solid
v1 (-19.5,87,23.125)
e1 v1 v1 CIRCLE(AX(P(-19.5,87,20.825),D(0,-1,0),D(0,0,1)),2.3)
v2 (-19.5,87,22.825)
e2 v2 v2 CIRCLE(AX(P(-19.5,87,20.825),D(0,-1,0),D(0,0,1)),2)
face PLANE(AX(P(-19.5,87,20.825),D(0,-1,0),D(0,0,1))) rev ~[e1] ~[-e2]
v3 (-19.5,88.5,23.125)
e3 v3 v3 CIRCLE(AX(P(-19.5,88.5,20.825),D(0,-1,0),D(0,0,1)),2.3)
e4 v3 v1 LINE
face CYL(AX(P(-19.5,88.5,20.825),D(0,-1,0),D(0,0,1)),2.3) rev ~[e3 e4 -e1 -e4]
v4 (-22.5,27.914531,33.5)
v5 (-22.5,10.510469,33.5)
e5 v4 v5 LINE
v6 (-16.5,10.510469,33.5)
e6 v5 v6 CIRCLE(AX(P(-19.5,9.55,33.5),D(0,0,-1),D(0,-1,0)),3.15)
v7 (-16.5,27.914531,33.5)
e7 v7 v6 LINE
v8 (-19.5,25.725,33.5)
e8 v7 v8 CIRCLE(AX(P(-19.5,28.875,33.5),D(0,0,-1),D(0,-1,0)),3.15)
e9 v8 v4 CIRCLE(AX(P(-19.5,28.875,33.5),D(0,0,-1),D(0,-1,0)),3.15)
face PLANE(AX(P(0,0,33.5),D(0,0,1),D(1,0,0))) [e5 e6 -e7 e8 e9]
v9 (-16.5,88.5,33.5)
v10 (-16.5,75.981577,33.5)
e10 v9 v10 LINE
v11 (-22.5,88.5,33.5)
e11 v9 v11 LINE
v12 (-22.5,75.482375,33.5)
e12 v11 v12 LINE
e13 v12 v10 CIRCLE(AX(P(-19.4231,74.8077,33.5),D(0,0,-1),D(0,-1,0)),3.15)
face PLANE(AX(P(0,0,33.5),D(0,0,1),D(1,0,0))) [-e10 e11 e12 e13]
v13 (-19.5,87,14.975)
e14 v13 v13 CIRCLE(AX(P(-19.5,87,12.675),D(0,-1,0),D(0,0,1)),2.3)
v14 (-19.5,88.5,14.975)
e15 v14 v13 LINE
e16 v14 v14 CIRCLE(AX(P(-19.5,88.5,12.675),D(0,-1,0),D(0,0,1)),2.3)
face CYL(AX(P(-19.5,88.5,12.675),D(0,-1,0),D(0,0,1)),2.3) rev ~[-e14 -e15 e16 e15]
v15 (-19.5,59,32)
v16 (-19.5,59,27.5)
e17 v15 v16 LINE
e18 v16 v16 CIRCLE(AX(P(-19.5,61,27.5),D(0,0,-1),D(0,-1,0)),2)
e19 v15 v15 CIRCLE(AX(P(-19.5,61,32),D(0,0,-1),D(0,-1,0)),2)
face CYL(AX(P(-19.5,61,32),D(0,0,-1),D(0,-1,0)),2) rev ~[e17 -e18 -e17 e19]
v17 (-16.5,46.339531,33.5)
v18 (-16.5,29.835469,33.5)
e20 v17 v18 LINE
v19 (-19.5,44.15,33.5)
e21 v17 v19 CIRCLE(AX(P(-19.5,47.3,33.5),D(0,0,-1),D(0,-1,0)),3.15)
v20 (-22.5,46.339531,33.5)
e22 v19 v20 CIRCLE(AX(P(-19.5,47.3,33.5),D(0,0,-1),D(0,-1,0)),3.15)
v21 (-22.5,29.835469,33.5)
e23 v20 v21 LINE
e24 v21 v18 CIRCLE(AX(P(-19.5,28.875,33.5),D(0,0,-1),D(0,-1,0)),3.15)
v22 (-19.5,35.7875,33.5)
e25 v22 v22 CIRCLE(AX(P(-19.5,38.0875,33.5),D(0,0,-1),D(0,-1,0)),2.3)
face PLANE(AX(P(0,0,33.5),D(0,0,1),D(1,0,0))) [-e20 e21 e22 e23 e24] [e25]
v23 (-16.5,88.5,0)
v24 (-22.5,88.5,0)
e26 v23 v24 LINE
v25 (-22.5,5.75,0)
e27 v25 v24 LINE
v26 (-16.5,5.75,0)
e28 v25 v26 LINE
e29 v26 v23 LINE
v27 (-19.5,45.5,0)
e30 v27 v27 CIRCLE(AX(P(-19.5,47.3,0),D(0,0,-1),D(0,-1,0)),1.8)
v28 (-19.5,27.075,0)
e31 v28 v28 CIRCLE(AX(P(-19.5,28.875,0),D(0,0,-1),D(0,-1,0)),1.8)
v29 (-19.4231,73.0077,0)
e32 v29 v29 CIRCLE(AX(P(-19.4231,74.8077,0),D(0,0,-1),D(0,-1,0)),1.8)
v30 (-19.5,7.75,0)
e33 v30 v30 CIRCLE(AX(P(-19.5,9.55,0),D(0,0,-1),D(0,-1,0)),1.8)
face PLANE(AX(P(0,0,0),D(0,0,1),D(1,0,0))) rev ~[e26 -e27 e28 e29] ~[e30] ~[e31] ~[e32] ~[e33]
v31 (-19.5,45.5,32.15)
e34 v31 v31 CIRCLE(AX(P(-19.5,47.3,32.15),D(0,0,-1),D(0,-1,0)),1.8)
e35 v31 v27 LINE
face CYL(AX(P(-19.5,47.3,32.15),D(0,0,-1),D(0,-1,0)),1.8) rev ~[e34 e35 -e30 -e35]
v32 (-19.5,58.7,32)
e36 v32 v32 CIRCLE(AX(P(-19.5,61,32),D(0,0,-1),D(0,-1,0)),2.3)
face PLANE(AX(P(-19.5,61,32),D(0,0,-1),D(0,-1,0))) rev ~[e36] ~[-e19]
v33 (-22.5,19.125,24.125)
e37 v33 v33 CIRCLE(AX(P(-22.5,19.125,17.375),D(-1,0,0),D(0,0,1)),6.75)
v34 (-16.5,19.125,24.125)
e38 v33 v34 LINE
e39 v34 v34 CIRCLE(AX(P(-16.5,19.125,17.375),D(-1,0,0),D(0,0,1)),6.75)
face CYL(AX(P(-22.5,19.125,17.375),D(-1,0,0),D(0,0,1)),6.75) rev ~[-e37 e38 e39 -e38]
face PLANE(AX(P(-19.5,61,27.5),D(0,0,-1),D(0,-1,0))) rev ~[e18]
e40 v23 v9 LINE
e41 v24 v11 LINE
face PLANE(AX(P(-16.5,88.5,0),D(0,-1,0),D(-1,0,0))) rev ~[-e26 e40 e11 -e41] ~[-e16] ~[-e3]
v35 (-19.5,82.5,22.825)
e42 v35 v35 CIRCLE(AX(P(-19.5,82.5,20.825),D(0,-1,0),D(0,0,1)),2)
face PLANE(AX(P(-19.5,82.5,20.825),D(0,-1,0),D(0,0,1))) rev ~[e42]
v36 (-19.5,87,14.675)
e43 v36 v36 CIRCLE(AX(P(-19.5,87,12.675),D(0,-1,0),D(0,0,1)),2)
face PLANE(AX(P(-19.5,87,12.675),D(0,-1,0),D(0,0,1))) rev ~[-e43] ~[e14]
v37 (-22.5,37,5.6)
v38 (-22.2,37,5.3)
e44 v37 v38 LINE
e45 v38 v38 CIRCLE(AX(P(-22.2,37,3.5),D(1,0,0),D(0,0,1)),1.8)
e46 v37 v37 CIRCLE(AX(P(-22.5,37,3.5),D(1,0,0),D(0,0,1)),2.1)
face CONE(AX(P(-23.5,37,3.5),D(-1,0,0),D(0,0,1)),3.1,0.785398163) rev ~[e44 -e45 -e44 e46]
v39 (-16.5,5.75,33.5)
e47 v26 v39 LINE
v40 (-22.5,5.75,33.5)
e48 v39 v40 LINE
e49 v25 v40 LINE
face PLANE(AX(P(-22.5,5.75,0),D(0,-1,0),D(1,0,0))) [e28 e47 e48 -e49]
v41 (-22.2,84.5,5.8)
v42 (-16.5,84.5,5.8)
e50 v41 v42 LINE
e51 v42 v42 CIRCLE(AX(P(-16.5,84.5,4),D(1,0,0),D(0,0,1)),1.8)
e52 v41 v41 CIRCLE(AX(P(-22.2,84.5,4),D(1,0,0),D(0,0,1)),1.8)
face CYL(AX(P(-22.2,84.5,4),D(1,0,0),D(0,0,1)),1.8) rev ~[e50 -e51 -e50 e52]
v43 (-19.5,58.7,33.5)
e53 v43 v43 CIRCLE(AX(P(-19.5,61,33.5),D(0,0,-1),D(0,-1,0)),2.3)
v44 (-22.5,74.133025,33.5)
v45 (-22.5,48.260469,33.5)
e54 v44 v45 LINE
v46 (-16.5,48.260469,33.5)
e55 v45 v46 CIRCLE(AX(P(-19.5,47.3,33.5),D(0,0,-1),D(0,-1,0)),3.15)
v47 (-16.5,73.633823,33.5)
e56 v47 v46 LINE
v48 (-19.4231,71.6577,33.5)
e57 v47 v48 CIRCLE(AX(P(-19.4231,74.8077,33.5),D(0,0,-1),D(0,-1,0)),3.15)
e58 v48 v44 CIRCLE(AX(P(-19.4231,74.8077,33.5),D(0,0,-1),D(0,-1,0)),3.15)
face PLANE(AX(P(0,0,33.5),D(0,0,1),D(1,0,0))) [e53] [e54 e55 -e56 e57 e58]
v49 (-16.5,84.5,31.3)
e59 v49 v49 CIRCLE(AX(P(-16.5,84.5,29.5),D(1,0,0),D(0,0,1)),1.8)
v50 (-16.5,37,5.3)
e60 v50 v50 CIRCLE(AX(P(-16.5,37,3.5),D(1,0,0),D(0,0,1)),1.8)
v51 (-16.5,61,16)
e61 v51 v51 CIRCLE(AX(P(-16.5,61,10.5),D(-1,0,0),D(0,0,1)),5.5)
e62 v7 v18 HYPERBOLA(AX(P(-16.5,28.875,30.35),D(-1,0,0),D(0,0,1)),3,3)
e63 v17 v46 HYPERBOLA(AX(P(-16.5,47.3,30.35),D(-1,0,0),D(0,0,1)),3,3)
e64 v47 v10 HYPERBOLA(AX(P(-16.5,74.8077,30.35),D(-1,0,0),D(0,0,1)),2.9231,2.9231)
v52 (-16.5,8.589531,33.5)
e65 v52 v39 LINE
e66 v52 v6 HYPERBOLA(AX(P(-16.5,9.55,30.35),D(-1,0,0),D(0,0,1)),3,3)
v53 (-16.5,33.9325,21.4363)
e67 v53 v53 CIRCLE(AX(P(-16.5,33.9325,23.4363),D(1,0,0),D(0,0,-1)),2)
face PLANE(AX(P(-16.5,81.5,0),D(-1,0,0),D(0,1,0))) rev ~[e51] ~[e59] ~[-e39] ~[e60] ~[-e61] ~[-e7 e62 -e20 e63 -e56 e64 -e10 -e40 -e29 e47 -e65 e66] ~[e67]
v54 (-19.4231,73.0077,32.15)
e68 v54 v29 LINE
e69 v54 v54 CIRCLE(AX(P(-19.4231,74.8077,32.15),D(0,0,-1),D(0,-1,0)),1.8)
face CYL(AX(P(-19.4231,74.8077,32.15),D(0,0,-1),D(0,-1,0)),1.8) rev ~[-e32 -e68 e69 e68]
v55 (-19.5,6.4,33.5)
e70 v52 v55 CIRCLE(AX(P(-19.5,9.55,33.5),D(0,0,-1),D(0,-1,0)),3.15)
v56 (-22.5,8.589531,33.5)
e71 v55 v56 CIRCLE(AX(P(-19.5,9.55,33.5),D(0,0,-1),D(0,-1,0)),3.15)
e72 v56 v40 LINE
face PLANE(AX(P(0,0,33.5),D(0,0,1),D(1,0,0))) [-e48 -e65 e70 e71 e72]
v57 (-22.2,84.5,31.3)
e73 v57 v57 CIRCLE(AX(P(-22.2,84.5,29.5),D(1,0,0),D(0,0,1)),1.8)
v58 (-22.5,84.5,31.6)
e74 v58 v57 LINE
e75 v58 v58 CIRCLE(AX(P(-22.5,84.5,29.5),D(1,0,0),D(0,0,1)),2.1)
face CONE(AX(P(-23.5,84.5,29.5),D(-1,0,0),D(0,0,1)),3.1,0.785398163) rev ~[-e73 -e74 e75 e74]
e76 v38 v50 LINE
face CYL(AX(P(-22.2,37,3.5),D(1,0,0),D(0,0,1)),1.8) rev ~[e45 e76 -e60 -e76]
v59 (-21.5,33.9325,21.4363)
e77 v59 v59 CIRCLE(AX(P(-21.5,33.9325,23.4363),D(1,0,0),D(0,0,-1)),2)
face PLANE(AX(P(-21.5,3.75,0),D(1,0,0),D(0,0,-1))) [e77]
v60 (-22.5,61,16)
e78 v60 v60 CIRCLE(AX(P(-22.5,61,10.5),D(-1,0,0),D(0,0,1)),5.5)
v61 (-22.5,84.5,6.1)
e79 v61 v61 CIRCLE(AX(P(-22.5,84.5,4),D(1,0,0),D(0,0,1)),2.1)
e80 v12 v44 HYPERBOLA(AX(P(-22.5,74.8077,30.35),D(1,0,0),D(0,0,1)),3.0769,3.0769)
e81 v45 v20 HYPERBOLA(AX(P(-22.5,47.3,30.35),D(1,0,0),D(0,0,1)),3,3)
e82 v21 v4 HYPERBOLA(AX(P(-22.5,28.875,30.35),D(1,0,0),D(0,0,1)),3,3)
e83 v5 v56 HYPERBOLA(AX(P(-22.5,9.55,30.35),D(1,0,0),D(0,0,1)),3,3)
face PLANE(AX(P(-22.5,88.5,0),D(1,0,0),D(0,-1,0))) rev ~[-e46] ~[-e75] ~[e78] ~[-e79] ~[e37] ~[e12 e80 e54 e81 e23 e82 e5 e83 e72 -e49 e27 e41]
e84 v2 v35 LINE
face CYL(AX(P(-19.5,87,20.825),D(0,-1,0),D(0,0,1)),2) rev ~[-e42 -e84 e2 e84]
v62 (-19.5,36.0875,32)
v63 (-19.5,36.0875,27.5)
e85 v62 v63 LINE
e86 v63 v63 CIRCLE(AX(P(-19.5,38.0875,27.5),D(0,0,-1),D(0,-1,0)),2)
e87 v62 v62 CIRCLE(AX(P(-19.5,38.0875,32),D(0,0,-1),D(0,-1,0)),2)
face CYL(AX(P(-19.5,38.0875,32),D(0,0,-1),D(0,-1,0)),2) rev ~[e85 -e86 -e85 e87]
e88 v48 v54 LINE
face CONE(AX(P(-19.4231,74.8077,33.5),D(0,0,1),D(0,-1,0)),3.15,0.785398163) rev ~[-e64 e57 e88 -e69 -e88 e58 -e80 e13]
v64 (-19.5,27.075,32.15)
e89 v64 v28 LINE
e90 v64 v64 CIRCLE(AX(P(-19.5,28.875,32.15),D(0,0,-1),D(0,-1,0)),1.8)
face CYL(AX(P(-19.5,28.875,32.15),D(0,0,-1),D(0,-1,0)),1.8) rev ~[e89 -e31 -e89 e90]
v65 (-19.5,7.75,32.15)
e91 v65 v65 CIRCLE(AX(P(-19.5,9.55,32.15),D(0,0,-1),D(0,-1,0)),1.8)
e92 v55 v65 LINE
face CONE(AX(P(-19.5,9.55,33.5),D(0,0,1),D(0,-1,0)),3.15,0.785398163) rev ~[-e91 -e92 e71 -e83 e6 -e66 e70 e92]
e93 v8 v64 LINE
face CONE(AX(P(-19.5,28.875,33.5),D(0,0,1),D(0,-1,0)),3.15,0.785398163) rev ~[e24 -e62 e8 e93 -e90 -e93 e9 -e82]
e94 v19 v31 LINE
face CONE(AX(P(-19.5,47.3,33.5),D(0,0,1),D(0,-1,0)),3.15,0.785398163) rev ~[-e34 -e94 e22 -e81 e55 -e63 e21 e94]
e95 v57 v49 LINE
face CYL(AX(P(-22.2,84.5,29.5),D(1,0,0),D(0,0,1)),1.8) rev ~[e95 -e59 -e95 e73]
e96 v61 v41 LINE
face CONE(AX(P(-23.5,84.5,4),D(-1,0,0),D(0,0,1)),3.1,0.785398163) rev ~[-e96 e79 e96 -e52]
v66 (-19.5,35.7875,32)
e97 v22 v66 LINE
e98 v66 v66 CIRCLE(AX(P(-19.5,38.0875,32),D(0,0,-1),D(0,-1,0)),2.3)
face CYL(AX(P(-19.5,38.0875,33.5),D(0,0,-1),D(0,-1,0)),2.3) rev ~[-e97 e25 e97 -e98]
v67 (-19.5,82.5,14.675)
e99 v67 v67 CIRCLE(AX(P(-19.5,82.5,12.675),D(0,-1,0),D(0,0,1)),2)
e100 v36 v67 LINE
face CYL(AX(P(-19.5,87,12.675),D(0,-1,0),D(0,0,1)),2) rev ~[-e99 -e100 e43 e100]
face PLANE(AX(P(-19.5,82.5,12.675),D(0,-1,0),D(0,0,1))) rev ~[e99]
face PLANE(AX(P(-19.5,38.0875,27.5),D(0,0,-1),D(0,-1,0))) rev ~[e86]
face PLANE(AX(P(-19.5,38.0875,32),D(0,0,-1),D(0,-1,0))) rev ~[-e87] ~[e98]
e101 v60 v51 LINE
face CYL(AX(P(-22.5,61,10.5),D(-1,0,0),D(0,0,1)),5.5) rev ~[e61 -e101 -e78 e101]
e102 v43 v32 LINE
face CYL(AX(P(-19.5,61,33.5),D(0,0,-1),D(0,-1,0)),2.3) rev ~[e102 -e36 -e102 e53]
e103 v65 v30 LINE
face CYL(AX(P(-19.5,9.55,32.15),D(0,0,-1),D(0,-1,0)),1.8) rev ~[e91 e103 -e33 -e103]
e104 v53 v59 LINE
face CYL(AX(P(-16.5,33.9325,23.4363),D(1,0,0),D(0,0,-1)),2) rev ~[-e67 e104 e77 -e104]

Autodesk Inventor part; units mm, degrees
ref_plane "YZ Plane" through (0, 0, 0) normal (1, 0, 0) x (0, 1, 0)
ref_plane "XZ Plane" through (0, 0, 0) normal (0, 1, 0) x (-1, 0, 0)
ref_plane "Work Plane1" through (0, 0, 0) normal (0, 0, 1) x (1, 0, 0)
sketch "Sketch1" plane through (0, 0, 0) normal (0, 0, 1) x (1, 0, 0)
  line L0 (23.5, 88.5) -> (-23.5, 88.5) projected
  line L1 (-23.5, 88.5) -> (-23.5, 36.5) projected
  line L2 (-26.5, 33.5) -> (-89, 33.5) projected
  line L3 (-89, 33.5) -> (-89, -72.5) projected
  line L4 (-89, -72.5) -> (-77, -72.5) projected
  line L5 (-74, -75.5) -> (-74, -93.5) projected
  line L6 (-74, -93.5) -> (74, -93.5) projected
  line L7 (74, -93.5) -> (74, -75.5) projected
  line L8 (77, -72.5) -> (89, -72.5) projected
  line L9 (89, -72.5) -> (89, 33.5) projected
  line L10 (89, 33.5) -> (26.5, 33.5) projected
  line L11 (23.5, 36.5) -> (23.5, 88.5) projected
  line L12 (-4.5, 81.5) -> (-4.5, 36.5) projected
  line L13 (-7.5, 33.5) -> (-13.5, 33.5) projected
  line L14 (-16.5, 36.5) -> (-16.5, 81.5) projected
  line L15 (7.5, 84.5) -> (13.5, 84.5) projected
  line L16 (16.5, 81.5) -> (16.5, 36.5) projected
  line L17 (13.5, 33.5) -> (7.5, 33.5) projected
  line L18 (4.5, 36.5) -> (4.5, 81.5) projected
  line L19 (-13.5, 84.5) -> (-7.5, 84.5) projected
  line L20 (-16.5, 88.5) -> (-22.5, 88.5)
  line L21 (-22.5, 88.5) -> (-22.5, 3.75)
  line L22 (-22.5, 3.75) -> (-16.5, 3.75)
  line L23 (-16.5, 3.75) -> (-16.5, 88.5)
  line L24 (-32.2, 4.75) -> (-59.9, 4.75)
  arc A0 (13.5, 33.5) -> (16.5, 36.5) centre (13.5, 36.5) ccw projected
  arc A1 (4.5, 36.5) -> (7.5, 33.5) centre (7.5, 36.5) ccw projected
  arc A2 (7.5, 84.5) -> (4.5, 81.5) centre (7.5, 81.5) ccw projected
  arc A3 (16.5, 81.5) -> (13.5, 84.5) centre (13.5, 81.5) ccw projected
  arc A4 (-4.5, 81.5) -> (-7.5, 84.5) centre (-7.5, 81.5) ccw projected
  arc A5 (-7.5, 33.5) -> (-4.5, 36.5) centre (-7.5, 36.5) ccw projected
  arc A6 (-16.5, 36.5) -> (-13.5, 33.5) centre (-13.5, 36.5) ccw projected
  arc A7 (-13.5, 84.5) -> (-16.5, 81.5) centre (-13.5, 81.5) ccw projected
  arc A8 (-26.5, 33.5) -> (-23.5, 36.5) centre (-26.5, 36.5) ccw projected
  arc A9 (-74, -75.5) -> (-77, -72.5) centre (-77, -75.5) ccw projected
  arc A10 (77, -72.5) -> (74, -75.5) centre (77, -75.5) ccw projected
  arc A11 (23.5, 36.5) -> (26.5, 33.5) centre (26.5, 36.5) ccw projected
  circle A12 centre (39.125, 25.9125) radius 1.0065 projected
  circle A13 centre (72.95, 12.275) radius 1.0065 projected
  circle A14 centre (-39.125, 12.3375) radius 1.0065 projected
  circle A15 centre (-72.95, 25.975) radius 1.0065 projected
  circle A16 centre (-72.95, 12.275) radius 1.0065 projected
  circle A17 centre (-39.125, 25.9125) radius 1.0065 projected
  circle A18 centre (72.95, 25.975) radius 1.0065 projected
  circle A19 centre (39.125, 12.3375) radius 1.0065 projected
  circle A20 centre (-42.4984, -44.6666) radius 1.2295 projected
  circle A21 centre (-79, -42.3889) radius 1.2295 projected
  circle A22 centre (-19.5, 28.875) radius 1.2295 projected
  circle A23 centre (19.5, 9.55) radius 1.2295 projected
  circle A24 centre (19.5, 47.3) radius 1.2295 projected
  circle A25 centre (-19.5, 47.3) radius 1.2295 projected
  circle A26 centre (0, 74.7) radius 1.2295 projected
  circle A27 centre (-19.4231, 74.8077) radius 1.2295 projected
  circle A28 centre (19.5, 74.7) radius 1.2295 projected
  circle A29 centre (0, 49.05) radius 1.2295 projected
  circle A30 centre (19.5, 28.875) radius 1.2295 projected
  circle A31 centre (0, 19.125) radius 1.2295 projected
  circle A32 centre (-19.5, 9.55) radius 1.2295 projected
  circle A33 centre (42.5, -44.6649) radius 1.2295 projected
  circle A34 centre (79, -42.3889) radius 1.2295 projected
  circle A35 centre (21.5, -85.5) radius 1.8 projected
  circle A36 centre (-64.5, -85.5) radius 1.8 projected
  circle A37 centre (-21.5, -85.5) radius 1.8 projected
  circle A38 centre (64.5, -85.5) radius 1.8 projected
  line L25 (-57, -78.5) -> (-82, -60.2553) projected
  line L26 (-82, -60.2553) -> (-82, -45.3889) projected
  line L27 (-76, -45.3889) -> (-45.4984, -47.6666) projected
  line L28 (-21.1, -27.9) -> (-21.1, -21.9) projected
  line L29 (-45.4984, -41.6666) -> (-76, -39.3889) projected
  line L30 (-82, -39.3889) -> (-82, 4.75) projected
  line L31 (30.3333, 4.75) -> (82, 4.75) projected
  line L32 (82, 4.75) -> (82, -39.3889) projected
  line L33 (76, -39.3889) -> (45.5, -41.6649) projected
  line L34 (21.1, -21.9) -> (21.1, -27.9) projected
  line L35 (45.5, -47.6649) -> (76, -45.3889) projected
  line L36 (82, -45.3889) -> (82, -60.2553) projected
  line L37 (82, -60.2553) -> (57, -78.5) projected
  line L38 (57, -78.5) -> (57, -87.5) projected
  arc A39 (55, -89.5) -> (57, -87.5) centre (55, -87.5) ccw projected
  line L39 (55, -89.5) -> (31, -89.5) projected
  arc A40 (29, -87.5) -> (31, -89.5) centre (31, -87.5) ccw projected
  line L40 (29, -87.5) -> (29, -78.5) projected
  line L41 (14, -78.5) -> (14, -87.5) projected
  arc A41 (12, -89.5) -> (14, -87.5) centre (12, -87.5) ccw projected
  line L42 (12, -89.5) -> (-12, -89.5) projected
  arc A42 (-14, -87.5) -> (-12, -89.5) centre (-12, -87.5) ccw projected
  line L43 (-14, -87.5) -> (-14, -78.5) projected
  line L44 (-29, -78.5) -> (-29, -87.5) projected
  arc A43 (-31, -89.5) -> (-29, -87.5) centre (-31, -87.5) ccw projected
  line L45 (-31, -89.5) -> (-55, -89.5) projected
  arc A44 (-57, -87.5) -> (-55, -89.5) centre (-55, -87.5) ccw projected
  line L46 (-57, -87.5) -> (-57, -78.5) projected
  line L47 (-69.95, 28.9125) -> (-42.125, 28.9125) projected
  line L48 (-42.125, 28.9125) -> (-42.125, 9.275) projected
  line L49 (-42.125, 9.275) -> (-69.95, 9.275) projected
  line L50 (-69.95, 9.275) -> (-69.95, 28.9125) projected
  line L51 (-16.5, 9.75) -> (-16.5, 28.5) projected
  line L52 (-16.5, 28.5) -> (-4.5, 28.5) projected
  line L53 (-4.5, 28.5) -> (-4.5, 9.75) projected
  line L54 (-4.5, 9.75) -> (-16.5, 9.75) projected
  line L55 (69.95, 9.3375) -> (42.125, 9.3375) projected
  line L56 (42.125, 9.3375) -> (42.125, 28.975) projected
  line L57 (42.125, 28.975) -> (69.95, 28.975) projected
  line L58 (69.95, 28.975) -> (69.95, 9.3375) projected
  line L59 (4.5, 9.75) -> (4.5, 28.5) projected
  line L60 (4.5, 28.5) -> (16.5, 28.5) projected
  line L61 (16.5, 28.5) -> (16.5, 9.75) projected
  line L62 (16.5, 9.75) -> (4.5, 9.75) projected
  line L63 (45.5, -41.6649) -> (27.1, -21.9) projected
  line L64 (27.1, -21.9) -> (30.3333, 4.75) projected
  line L65 (-45.4984, -47.6666) -> (-29, -78.5) projected
  line L66 (-82, 4.75) -> (-30.3333, 4.75) projected
  line L67 (-30.3333, 4.75) -> (-27.1, -21.9) projected
  line L68 (-27.1, -21.9) -> (-45.4984, -41.6666) projected
  line L69 (29, -78.5) -> (45.5, -47.6649) projected
  line L70 (-14, -78.5) -> (-39, -45.3279) projected
  line L71 (-39, -44.2124) -> (-21.1, -27.9) projected
  line L72 (-21.1, -21.9) -> (-24.3333, 4.75) projected
  line L73 (-24.3333, 4.75) -> (24.3333, 4.75) projected
  line L74 (24.3333, 4.75) -> (21.1, -21.9) projected
  line L75 (21.1, -27.9) -> (39.5, -44.6649) projected
  line L76 (39.5, -44.6649) -> (14, -78.5) projected
  circle A45 centre (-78, -67.1725) radius 1.2295 projected
  circle A46 centre (78, -67.1725) radius 1.2295 projected
  line L77 (-22.5, 28.9125) -> (-22.5, 9.55) projected
  line L78 (-22.5, 9.55) -> (-36.125, 9.55) projected
  line L79 (-36.125, 9.55) -> (-36.125, 28.9125) projected
  line L80 (-36.125, 28.9125) -> (-22.5, 28.9125) projected
  line L81 (76, -45.3889) -> (82, -45.3889) projected
  line L82 (82, -39.3889) -> (76, -39.3889) projected
  line L83 (36.125, 9.275) -> (22.5, 9.275) projected
  line L84 (22.5, 9.275) -> (22.5, 28.9125) projected
  line L85 (22.5, 28.9125) -> (36.125, 28.9125) projected
  line L86 (36.125, 28.9125) -> (36.125, 9.275) projected
  line L87 (-86, 28.975) -> (-75.95, 28.975) projected
  line L88 (-75.95, 28.975) -> (-75.95, 9.275) projected
  line L89 (-75.95, 9.275) -> (-86, 9.275) projected
  line L90 (-86, 9.275) -> (-86, 28.975) projected
  line L91 (-82, -45.3889) -> (-76, -45.3889) projected
  line L92 (-76, -39.3889) -> (-82, -39.3889) projected
  line L93 (75.95, 28.975) -> (86, 28.975) projected
  line L94 (86, 28.975) -> (86, 9.275) projected
  line L95 (86, 9.275) -> (75.95, 9.275) projected
  line L96 (75.95, 9.275) -> (75.95, 28.975) projected
  line L97 (-39, -45.3279) -> (-39, -44.2124) projected
  circle A47 centre (-24.1, -73.1) radius 1.2295 projected
  circle A48 centre (24.1, -24.9) radius 1.2295 projected
  circle A49 centre (-24.1, -24.9) radius 1.2295 projected
  circle A50 centre (24.1, -73.1) radius 1.2295 projected
  point P0 (0, 0)
  point P1 (-16.5, 36.5)
  point P2 (-16.5, 81.5)
  point P3 (7.5, 81.5)
  point P4 (13.5, 81.5)
  point P5 (-7.5, 81.5)
  point P6 (-13.5, 81.5)
  point P7 (-77, -75.5)
  point P8 (39, -44.2094)
  point P9 (-79, -67.8878)
  point P10 (-79, -66.4572)
  point P11 (-22.5, 25.9125)
  point P12 (-22.5, 12.55)
  point P13 (7.5, 81.5)
  point P14 (13.5, 81.5)
  point P15 (-7.5, 81.5)
  point P16 (-13.5, 81.5)
  dimension "d0" = 1
  dimension "d2" = 1
ref_plane "Work Plane2" through (-89, -40.3889, 33.5) normal (0, 0, 1) x (1, 0, 0)
extrude "Extrusion1" add sketch "Sketch1" along normal up to surface (33.5 mm away) contours L23 L14 L73 L21 L0 | L73 L23 L22 L21 | A22 | A25 | A27 | A32
sketch "Sketch2" plane through (-22.5, 3.75, 0) normal (-1, 0, 0) x (0, 0, 1)
  arc A0 (15.7043, 9.7757) -> (16.863, 11.545) centre (12.3771, 13.2188) ccw projected
  arc A1 (16.863, 11.545) -> (17.4685, 11.512) centre (17.375, 15.375) ccw projected
  arc A2 (17.4685, 11.512) -> (18.4285, 9.6275) centre (22.1095, 12.6893) ccw projected
  arc A3 (18.4285, 9.6275) -> (19.3146, 9.863) centre (17.375, 15.375) ccw projected
  arc A4 (19.3146, 9.863) -> (19.2121, 11.9755) centre (14.599, 10.6929) ccw projected
  arc A5 (19.2121, 11.9755) -> (19.7212, 12.3047) centre (17.375, 15.375) ccw projected
  arc A6 (19.7212, 12.3047) -> (21.6056, 11.3444) centre (22.7839, 15.9851) ccw projected
  arc A7 (21.6056, 11.3444) -> (22.184, 12.0558) centre (17.375, 15.375) ccw projected
  arc A8 (22.184, 12.0558) -> (20.8594, 13.7045) centre (17.8813, 9.9554) ccw projected
  arc A9 (20.8594, 13.7045) -> (21.0778, 14.2702) centre (17.375, 15.375) ccw projected
  arc A10 (21.0778, 14.2702) -> (23.1668, 14.6008) centre (21.3923, 19.0479) ccw projected
  arc A11 (23.1668, 14.6008) -> (23.2166, 15.5164) centre (17.375, 15.375) ccw projected
  arc A12 (23.2166, 15.5164) -> (21.1758, 16.0716) centre (20.9701, 11.288) ccw projected
  arc A13 (21.1758, 16.0716) -> (21.02, 16.6576) centre (17.375, 15.375) ccw projected
  arc A14 (21.02, 16.6576) -> (22.5157, 18.153) centre (18.4662, 20.7077) ccw projected
  arc A15 (22.5157, 18.153) -> (22.0178, 18.923) centre (17.375, 15.375) ccw projected
  arc A16 (22.0178, 18.923) -> (20.0404, 18.1726) centre (22.6858, 14.1817) ccw projected
  arc A17 (20.0404, 18.1726) -> (19.57, 18.5552) centre (17.375, 15.375) ccw projected
  arc A18 (19.57, 18.5552) -> (19.9011, 20.644) centre (15.1233, 20.3306) ccw projected
  arc A19 (19.9011, 20.644) -> (19.0457, 20.9743) centre (17.375, 15.375) ccw projected
  arc A20 (19.0457, 20.9743) -> (17.887, 19.205) centre (22.3729, 17.5312) ccw projected
  arc A21 (17.887, 19.205) -> (17.2815, 19.238) centre (17.375, 15.375) ccw projected
  arc A22 (17.2815, 19.238) -> (16.3215, 21.1225) centre (12.6405, 18.0607) ccw projected
  arc A23 (16.3215, 21.1225) -> (15.4354, 20.887) centre (17.375, 15.375) ccw projected
  arc A24 (15.4354, 20.887) -> (15.5379, 18.7745) centre (20.151, 20.0571) ccw projected
  arc A25 (15.5379, 18.7745) -> (15.0288, 18.4453) centre (17.375, 15.375) ccw projected
  arc A26 (15.0288, 18.4453) -> (13.1444, 19.4056) centre (11.9661, 14.7649) ccw projected
  arc A27 (13.1444, 19.4056) -> (12.566, 18.6942) centre (17.375, 15.375) ccw projected
  arc A28 (12.566, 18.6942) -> (13.8906, 17.0455) centre (16.8687, 20.7946) ccw projected
  arc A29 (13.8906, 17.0455) -> (13.6722, 16.4798) centre (17.375, 15.375) ccw projected
  arc A30 (13.6722, 16.4798) -> (11.5832, 16.1492) centre (13.3577, 11.7021) ccw projected
  arc A31 (11.5832, 16.1492) -> (11.5334, 15.2336) centre (17.375, 15.375) ccw projected
  arc A32 (11.5334, 15.2336) -> (13.5742, 14.6784) centre (13.7799, 19.462) ccw projected
  arc A33 (13.5742, 14.6784) -> (13.73, 14.0924) centre (17.375, 15.375) ccw projected
  arc A34 (13.73, 14.0924) -> (12.2343, 12.597) centre (16.2838, 10.0423) ccw projected
  arc A35 (12.2343, 12.597) -> (12.7322, 11.827) centre (17.375, 15.375) ccw projected
  arc A36 (12.7322, 11.827) -> (14.7096, 12.5774) centre (12.0642, 16.5683) ccw projected
  arc A37 (14.7096, 12.5774) -> (15.18, 12.1948) centre (17.375, 15.375) ccw projected
  arc A38 (15.18, 12.1948) -> (14.8489, 10.106) centre (19.6267, 10.4194) ccw projected
  arc A39 (14.8489, 10.106) -> (15.7043, 9.7757) centre (17.375, 15.375) ccw projected
  circle A40 centre (17.375, 15.375) radius 6.75
  circle A41 centre (17.375, 15.375) radius 5.8433
  line L0 (23.2183, 15.375) -> (24.125, 15.375)
  circle A42 centre (10.5, 57.25) radius 5.5 projected
  point P0 (0, -3.75)
  dimension "d6" = 13.5
  dimension "d5" = 0.9067
  dimension "d9" = 11
extrude "Extrusion2" cut sketch "Sketch2" against normal up to next contours A39 A38 A37 A36 A35 A34 A33 A32 A31 A30 A29 A28 A27 A26 A25 A24 A23 A22 A21 A20 A19 A18 A17 A16 A15 A14 A13 A12 A11 A10 A9 A8 A7 A6 A5 A4 A3 A2 A1 A0 | A0 A1 A2 A41 | A41 A36 A37 A38 | A4 A5 A6 A41 | A41 A32 A33 A34 | A8 A9 A10 A41 | A41 A28 A29 A30 | A41 A24 A25 A26 | A12 A13 A14 A41 | A41 A20 A21 A22 | A16 A17 A18 A41 | A40 | A42
sketch "Sketch3" plane through (-16.5, 3.75, 0) normal (1, 0, 0) x (0, 0, -1)
  circle A0 centre (-23.4363, 30.1825) radius 2 projected
  point P0 (0, -3.75)
extrude "Extrusion3" cut sketch "Sketch3" against normal blind 5
ref_plane "Work Plane3" through (-23.5, 3.75, 0) normal (-1, 0, 0) x (0, 0, 1)
sketch "Sketch5" plane through (-23.5, 3.75, 0) normal (-1, 0, 0) x (0, 0, 1)
  circle A0 centre (29.5, 80.75) radius 2.1 projected
  circle A1 centre (4, 80.75) radius 2.1 projected
  circle A2 centre (3.5, 33.25) radius 2.1 projected
  point P0 (0, -3.75)
hole "Hole1" at (-23.5, 84.5, 29.5) at (-23.5, 84.5, 4) at (-23.5, 37, 3.5) direction (1, 0, 0) diameter 3.6 end through all countersink diameter 6.2 countersink angle 90 clearance for "Countersunk Flat Head Screw ISO 2009/7046" size "M3" standard "ISO"
sketch "Sketch6" plane through (-22.5, 3.75, 33.5) normal (0, 0, 1) x (1, 0, 0)
  line L0 (0, 8.625) -> (0, 22.125) projected
  line L1 (1, 32.1825) -> (1, 28.1825) projected
  line L2 (0, 31.15) -> (0, 35.35) projected
  line L3 (0, 51.75) -> (0, 62.75) projected
  line L4 (0, 78.65) -> (0, 82.85) projected
  line L5 (0, 78.65) -> (0, 82.85) projected
  line L6 (6, 0) -> (0, 0) projected
  line L7 (6, 84.75) -> (6, 0) projected
  line L8 (0, 84.75) -> (6, 84.75) projected
  line L9 (0, 0) -> (0, 84.75) projected
  line L10 (6, 28.125) -> (0, 28.125)
  line L11 (0, 28.125) -> (0, 35.35)
  line L12 (0, 35.35) -> (6, 35.35)
  line L13 (6, 35.35) -> (6, 28.125)
  line L14 (0, 8.625) -> (6, 8.625) projected
  line L15 (6, 8.625) -> (0, 8.625)
  line L16 (0, 8.625) -> (0, 22.125)
  line L17 (0, 22.125) -> (6, 22.125)
  line L18 (6, 22.125) -> (6, 8.625)
  line L19 (6, 78.95) -> (0.3, 78.95) projected
  line L20 (6, 84.75) -> (0, 84.75) projected
  line L21 (6, 78.95) -> (0, 78.95)
  line L22 (0, 78.95) -> (0, 84.75)
  line L23 (0, 84.75) -> (6, 84.75)
  line L24 (6, 84.75) -> (6, 78.95)
  line L25 (0, 51.75) -> (6, 51.75) projected
  line L26 (0, 51.75) -> (0, 62.75) projected
  line L27 (6, 51.75) -> (0, 51.75)
  line L28 (0, 51.75) -> (0, 62.75)
  line L29 (0, 62.75) -> (6, 62.75)
  line L30 (6, 62.75) -> (6, 51.75)
  line L31 (6, 0) -> (0, 0)
  line L32 (0, 0) -> (0, 4)
  line L33 (0, 4) -> (6, 4)
  line L34 (6, 4) -> (6, 0)
  circle A0 centre (3, 5.8) radius 1.8
  line L35 (6, 22.125) -> (0, 28.125)
  line L36 (0, 22.125) -> (6, 28.125)
  line L37 (6, 35.35) -> (0, 51.75)
  line L38 (0, 35.35) -> (6, 51.75)
  line L39 (0.3, 82.55) -> (0.3, 78.95) projected
  line L40 (6, 62.75) -> (0.3, 78.95)
  line L41 (6, 82.55) -> (6, 78.95) projected
  line L42 (0.3, 78.95) -> (6, 78.95)
  line L43 (6, 78.95) -> (0, 62.75)
  point P0 (22.5, -3.75)
  point P1 (3, 25.125)
  point P2 (3.0769, 71.0577)
  point P3 (3, 43.55)
  dimension "d20" = 4
  dimension "d21" = 3.6
  dimension "d22" = 3
  dimension "d23" = 3
hole "Hole2" at (-19.5, 28.875, 33.5) at (-19.5, 9.55, 33.5) at (-19.4231, 74.8077, 33.5) at (-19.5, 47.3, 33.5) direction (0, 0, -1) diameter 3.6 end through all countersink diameter 6.3 countersink angle 90 clearance for "Countersunk Flat Head Screw ISO 2009/7046" size "M3" standard "ISO"
sketch "Sketch9" plane through (-22.5, 88.5, 0) normal (0, 1, 0) x (1, 0, 0)
  circle A0 centre (22.5, -20.825) radius 2.3 projected
  circle A1 centre (22.5, -12.675) radius 2.3 projected
  line L0 (18, -33.5) -> (27, -33.5) projected
  line L1 (27, 0) -> (27, -33.5) projected
  line L2 (27, 0) -> (18, 0) projected
  line L3 (18, 0) -> (18, -33.5) projected
  line L4 (22.5, -20.825) -> (0, -20.825)
  line L5 (0, -24.125) -> (0, -10.625) projected
  line L6 (22.5, -12.675) -> (0, -12.675)
  line L7 (6, 0) -> (6, -33.5) projected
  point P0 (22.5, 0)
  point P1 (3, -20.825)
  point P2 (3, -12.675)
  dimension "d45" = 3
  dimension "d46" = 3
  dimension "d47" = 3
  dimension "d48" = 3
hole "Hole5" at (-19.5, 88.5, 20.825) at (-19.5, 88.5, 12.675) direction (0, -1, 0) diameter 4 depth 6 counterbore diameter 4.6 counterbore depth 1.5
sketch "Sketch10" plane through (-19.5, 47.3, 33.5) normal (0, 0, 1) x (1, 0, 0)
  line L0 (-3, 8.2) -> (-3, 19.2) projected
  arc A0 (3, -17.4645) -> (-3, -17.4645) centre (0, -18.425) ccw projected
  arc A1 (-3, -0.9605) -> (3, -0.9605) centre (0, 0) ccw projected
  arc A2 (3, -17.4645) -> (-3, -17.4645) centre (0, -18.425) ccw projected
  line L1 (3, -0.9605) -> (3, -17.4645) projected
  arc A3 (-3, -0.9605) -> (3, -0.9605) centre (0, 0) ccw projected
  line L2 (-3, -17.4645) -> (-3, -0.9605) projected
  line L3 (3, 8.2) -> (-3, 8.2)
  line L4 (3, 19.2) -> (-3, 19.2)
  line L5 (-3, 19.2) -> (3, 8.2)
  line L6 (-3, 8.2) -> (3, 19.2)
  line L7 (3, -17.4645) -> (-3, -0.9605)
  line L8 (-3, -17.4645) -> (3, -0.9605)
  point P0 (19.5, -47.3)
  point P1 (0, -9.2125)
  point P2 (0, 13.7)
hole "Hole6" at (-19.5, 38.0875, 33.5) at (-19.5, 61, 33.5) direction (0, 0, -1) diameter 4 depth 6 counterbore diameter 4.6 counterbore depth 1.5
sketch "Sketch11" plane through (-22.5, 3.75, 0) normal (0, -1, 0) x (1, 0, 0)
  line L0 (6, 33.5) -> (0, 33.5) projected
  line L1 (0, 0) -> (0, 33.5) projected
  line L2 (0, 0) -> (6, 0) projected
  line L3 (6, 0) -> (6, 33.5) projected
  point P0 (22.5, 0)
extrude "Extrusion4" cut sketch "Sketch11" against normal blind 2
equation "\"d22\" = d23"
equation "\"d45\" = d46"
equation "\"d47\" = d48"
properties part number "right_gear_holder" material "Nylon 6/6"
